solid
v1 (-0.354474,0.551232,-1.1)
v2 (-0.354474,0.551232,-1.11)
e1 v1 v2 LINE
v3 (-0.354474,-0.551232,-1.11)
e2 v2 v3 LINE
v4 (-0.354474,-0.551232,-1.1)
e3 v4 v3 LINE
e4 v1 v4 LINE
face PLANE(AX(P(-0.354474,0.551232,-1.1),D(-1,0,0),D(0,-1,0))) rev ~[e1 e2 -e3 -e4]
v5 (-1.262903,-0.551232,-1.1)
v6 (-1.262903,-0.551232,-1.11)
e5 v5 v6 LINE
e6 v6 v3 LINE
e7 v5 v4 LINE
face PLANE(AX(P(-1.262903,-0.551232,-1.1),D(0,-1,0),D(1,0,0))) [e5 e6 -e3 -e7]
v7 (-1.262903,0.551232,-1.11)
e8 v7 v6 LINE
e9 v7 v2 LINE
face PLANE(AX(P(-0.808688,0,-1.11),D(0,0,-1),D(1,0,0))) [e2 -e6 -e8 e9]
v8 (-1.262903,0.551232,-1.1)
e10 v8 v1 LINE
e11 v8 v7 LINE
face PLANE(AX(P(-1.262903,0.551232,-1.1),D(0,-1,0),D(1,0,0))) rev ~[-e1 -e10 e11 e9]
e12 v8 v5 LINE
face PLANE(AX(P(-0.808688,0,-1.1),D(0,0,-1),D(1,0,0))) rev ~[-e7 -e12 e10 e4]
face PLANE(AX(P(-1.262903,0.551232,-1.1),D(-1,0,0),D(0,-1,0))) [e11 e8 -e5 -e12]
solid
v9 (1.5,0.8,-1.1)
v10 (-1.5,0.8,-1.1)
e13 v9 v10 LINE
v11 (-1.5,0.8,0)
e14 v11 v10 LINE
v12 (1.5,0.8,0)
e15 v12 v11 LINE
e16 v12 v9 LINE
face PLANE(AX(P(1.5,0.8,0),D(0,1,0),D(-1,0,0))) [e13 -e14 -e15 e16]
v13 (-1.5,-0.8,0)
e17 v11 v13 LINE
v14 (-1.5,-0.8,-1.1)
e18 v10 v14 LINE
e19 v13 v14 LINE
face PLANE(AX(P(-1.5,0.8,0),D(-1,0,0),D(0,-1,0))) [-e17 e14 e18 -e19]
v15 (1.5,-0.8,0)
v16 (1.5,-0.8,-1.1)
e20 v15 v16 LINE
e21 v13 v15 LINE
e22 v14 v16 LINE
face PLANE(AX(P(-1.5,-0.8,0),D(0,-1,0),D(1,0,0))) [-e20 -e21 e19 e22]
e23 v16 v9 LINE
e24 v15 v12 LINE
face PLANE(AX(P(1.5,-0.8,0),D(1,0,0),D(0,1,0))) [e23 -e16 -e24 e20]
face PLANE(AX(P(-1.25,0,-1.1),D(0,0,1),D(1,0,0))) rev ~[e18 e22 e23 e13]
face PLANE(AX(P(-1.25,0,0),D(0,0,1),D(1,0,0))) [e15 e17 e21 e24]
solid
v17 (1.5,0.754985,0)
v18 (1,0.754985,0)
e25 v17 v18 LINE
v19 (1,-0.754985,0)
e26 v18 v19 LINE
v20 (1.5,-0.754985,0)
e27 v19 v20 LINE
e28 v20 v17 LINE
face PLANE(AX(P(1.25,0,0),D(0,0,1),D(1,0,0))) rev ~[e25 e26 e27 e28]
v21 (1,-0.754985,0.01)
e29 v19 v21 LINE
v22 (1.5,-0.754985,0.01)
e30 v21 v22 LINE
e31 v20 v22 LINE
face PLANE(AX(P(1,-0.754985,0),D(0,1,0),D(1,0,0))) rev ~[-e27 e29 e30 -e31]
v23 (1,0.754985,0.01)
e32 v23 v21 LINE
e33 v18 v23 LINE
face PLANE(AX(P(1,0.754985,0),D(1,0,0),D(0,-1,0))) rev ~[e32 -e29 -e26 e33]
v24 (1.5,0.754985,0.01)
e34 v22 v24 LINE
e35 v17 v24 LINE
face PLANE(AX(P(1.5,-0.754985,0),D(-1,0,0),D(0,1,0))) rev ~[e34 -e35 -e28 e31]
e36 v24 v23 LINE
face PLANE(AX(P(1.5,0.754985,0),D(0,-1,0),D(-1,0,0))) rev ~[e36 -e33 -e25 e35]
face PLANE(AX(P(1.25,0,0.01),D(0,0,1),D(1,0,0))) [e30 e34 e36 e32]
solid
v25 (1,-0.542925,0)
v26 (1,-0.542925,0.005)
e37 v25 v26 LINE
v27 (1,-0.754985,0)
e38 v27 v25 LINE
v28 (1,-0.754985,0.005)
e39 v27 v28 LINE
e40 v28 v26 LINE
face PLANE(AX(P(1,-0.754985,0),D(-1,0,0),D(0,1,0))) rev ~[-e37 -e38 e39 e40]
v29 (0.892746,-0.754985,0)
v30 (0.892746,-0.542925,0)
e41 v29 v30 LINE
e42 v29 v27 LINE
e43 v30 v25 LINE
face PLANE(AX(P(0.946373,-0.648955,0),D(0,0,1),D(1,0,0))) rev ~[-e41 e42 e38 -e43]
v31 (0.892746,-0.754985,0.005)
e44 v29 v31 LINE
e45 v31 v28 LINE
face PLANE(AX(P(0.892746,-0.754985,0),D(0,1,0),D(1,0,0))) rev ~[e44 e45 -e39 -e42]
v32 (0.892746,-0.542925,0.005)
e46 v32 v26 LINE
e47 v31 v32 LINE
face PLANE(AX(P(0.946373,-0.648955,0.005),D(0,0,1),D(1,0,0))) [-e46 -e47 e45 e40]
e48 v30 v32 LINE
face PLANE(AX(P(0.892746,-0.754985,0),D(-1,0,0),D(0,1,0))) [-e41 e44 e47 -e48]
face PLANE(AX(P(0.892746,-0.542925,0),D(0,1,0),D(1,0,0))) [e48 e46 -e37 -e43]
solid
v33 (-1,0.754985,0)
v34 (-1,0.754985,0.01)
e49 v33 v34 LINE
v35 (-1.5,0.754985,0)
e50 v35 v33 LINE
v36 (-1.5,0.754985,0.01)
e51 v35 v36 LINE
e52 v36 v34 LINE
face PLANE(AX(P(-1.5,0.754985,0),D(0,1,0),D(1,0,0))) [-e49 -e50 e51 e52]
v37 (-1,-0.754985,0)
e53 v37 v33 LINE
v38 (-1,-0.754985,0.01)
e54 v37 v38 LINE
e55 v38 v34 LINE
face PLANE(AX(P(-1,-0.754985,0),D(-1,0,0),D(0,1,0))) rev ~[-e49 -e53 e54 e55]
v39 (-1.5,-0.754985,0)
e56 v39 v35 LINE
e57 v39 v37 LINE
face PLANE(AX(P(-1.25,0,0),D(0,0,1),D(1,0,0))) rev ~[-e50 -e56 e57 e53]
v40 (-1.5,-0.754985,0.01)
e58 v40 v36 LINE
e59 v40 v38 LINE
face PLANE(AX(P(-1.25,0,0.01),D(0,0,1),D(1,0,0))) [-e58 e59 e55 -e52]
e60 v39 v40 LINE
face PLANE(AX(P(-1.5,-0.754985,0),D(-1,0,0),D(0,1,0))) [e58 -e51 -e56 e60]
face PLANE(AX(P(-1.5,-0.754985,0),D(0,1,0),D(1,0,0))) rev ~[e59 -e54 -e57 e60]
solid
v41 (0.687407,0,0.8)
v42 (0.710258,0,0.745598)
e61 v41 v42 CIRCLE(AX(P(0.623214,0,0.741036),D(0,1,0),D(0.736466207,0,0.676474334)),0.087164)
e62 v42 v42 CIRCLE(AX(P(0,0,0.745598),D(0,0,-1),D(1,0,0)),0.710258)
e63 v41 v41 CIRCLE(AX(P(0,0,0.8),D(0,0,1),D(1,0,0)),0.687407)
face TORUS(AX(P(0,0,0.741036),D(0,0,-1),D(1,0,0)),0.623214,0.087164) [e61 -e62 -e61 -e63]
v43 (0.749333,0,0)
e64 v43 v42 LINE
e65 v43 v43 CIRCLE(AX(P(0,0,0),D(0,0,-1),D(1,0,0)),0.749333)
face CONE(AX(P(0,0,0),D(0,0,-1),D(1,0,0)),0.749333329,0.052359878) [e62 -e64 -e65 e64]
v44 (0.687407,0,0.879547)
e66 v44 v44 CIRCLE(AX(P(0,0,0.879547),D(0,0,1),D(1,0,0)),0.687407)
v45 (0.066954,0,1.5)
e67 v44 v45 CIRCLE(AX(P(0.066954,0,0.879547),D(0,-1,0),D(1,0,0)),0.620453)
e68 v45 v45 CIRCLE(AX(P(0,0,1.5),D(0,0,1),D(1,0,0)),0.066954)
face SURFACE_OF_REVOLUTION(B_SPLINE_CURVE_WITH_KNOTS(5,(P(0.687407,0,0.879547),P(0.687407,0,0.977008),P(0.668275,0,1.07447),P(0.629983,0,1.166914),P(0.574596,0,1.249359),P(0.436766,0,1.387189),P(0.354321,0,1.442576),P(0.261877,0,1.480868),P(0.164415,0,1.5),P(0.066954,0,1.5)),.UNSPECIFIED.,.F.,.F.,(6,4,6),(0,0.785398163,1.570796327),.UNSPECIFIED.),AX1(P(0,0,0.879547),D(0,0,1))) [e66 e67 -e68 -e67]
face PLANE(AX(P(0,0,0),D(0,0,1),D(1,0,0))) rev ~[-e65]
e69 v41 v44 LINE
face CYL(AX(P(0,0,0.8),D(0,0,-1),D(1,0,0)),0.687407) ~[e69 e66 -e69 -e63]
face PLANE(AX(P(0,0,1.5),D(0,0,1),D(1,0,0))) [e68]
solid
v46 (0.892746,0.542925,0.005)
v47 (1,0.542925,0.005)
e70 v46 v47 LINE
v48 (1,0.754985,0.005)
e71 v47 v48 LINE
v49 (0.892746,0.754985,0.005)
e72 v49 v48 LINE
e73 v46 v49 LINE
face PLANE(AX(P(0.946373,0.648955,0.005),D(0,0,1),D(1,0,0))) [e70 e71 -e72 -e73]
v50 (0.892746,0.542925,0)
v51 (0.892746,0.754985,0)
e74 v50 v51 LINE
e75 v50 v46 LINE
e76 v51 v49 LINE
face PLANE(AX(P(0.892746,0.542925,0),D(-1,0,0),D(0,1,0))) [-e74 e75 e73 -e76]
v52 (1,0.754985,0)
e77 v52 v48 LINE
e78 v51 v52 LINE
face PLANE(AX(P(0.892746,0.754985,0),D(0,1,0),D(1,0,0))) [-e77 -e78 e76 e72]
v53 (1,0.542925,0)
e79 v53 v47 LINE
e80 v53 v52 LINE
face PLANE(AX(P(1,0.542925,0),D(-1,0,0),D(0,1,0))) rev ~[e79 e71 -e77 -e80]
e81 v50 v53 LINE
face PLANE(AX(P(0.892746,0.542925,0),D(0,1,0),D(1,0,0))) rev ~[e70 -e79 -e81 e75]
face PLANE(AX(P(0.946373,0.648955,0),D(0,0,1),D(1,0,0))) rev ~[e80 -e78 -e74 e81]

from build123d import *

# Parameters (mm, degrees)
F0_W      = 0.5
F0_H      = 1.5099706361
F0_R      = 0.7493333287
F0_W_2    = 0.1072544944
F0_H_2    = 0.2120600548
F1_DEPTH  = 1.1
F2_DEPTH  = 0.8
F2_TAPER  = 3
F4_DEPTH  = 0.01
F5_DEPTH  = 0.005
F3_R      = 0.6874071052
F6_DEPTH  = 0.7
F7_R      = 0.6204528855
F9_W      = 0.9084290941
F9_H      = 1.1024641572
F10_DEPTH = 0.01


# Not quite as in the source:
# - a fillet or chamfer that OpenCascade refuses, or shapes differently, is made with other operations: its cross-section is extruded or revolved along the edge and cut away or added


with BuildPart() as f1:
    # F0 (on Top) → F1 (new body)
    with BuildSketch(Plane.XY):
        with Locations((-1.25, 0)):
            Rectangle(F0_W, F0_H)
        Polygon((-1.5, -0.8), (1.5, -0.8), (1.5, -0.7549853181), (1, -0.7549853181), (0.8927455056, -0.7549853181), (0.8927455056, -0.5429252633), (1, -0.5429252633), (1, 0.5429252633), (0.8927455056, 0.5429252633), (0.8927455056, 0.7549853181), (1, 0.7549853181), (1.5, 0.7549853181), (1.5, 0.8), (-1.5, 0.8), (-1.5, 0.7549853181), (-1, 0.7549853181), (-1, -0.7549853181), (-1.5, -0.7549853181), align=None)
        Circle(F0_R, mode=Mode.SUBTRACT)
        Circle(F0_R)
        with Locations((0.9463727528, 0.6489552907)):
            Rectangle(F0_W_2, F0_H_2)
        Polygon((1, -0.7549853181), (1.5, -0.7549853181), (1.5, 0.7549853181), (1, 0.7549853181), (1, 0.5429252633), (1, -0.5429252633), align=None)
        with Locations((0.9463727528, -0.6489552907)):
            Rectangle(F0_W_2, F0_H_2)
    extrude(amount=-F1_DEPTH)


with BuildPart() as f2:
    # F0 (on Top) → F2 (new body)
    with BuildSketch(Plane.XY):
        Circle(F0_R)
    extrude(amount=F2_DEPTH, taper=F2_TAPER)

    # F3 (on face) → F6 (join)
    with BuildSketch(Plane.XY.offset(0.8)):
        Circle(F3_R)
    extrude(amount=F6_DEPTH)

    # F7
    f7_edges = [f2.edges().sort_by_distance(p)[0] for p in [
        (-0.687407, 0, 1.5),
    ]]
    fillet(f7_edges, radius=F7_R)

    # F8: fillet of radius 0.0871635846 on 1 edges, made by hand

    # F8_s1 → F8_t2 (revolve, cut)
    with BuildSketch(Plane.XZ):
        with BuildLine():
            ThreePointArc((0.6874071052, 0.8), (0.703576177, 0.7747914026), (0.7102582005, 0.7455978618))
            Line((0.7102582005, 0.7455978618), (0.7074071052, 0.8))
            Line((0.7074071052, 0.8), (0.6874071052, 0.8))
        make_face()
    revolve(axis=Axis((0, 0, 0.8), (0, 0, -1)), mode=Mode.SUBTRACT)


with BuildPart() as f4:
    # F0 (on Top) → F4 (new body)
    with BuildSketch(Plane.XY):
        with Locations((-1.25, 0)):
            Rectangle(F0_W, F0_H)
    extrude(amount=F4_DEPTH)


with BuildPart() as f4b:
    # F0 (on Top) → F4, piece 2 (new body)
    with BuildSketch(Plane.XY):
        Polygon((1, -0.7549853181), (1.5, -0.7549853181), (1.5, 0.7549853181), (1, 0.7549853181), (1, 0.5429252633), (1, -0.5429252633), align=None)
    extrude(amount=F4_DEPTH)


with BuildPart() as f5:
    # F0 (on Top) → F5 (new body)
    with BuildSketch(Plane.XY):
        with Locations((0.9463727528, -0.6489552907)):
            Rectangle(F0_W_2, F0_H_2)
    extrude(amount=F5_DEPTH)


with BuildPart() as f5b:
    # F0 (on Top) → F5, piece 2 (new body)
    with BuildSketch(Plane.XY):
        with Locations((0.9463727528, 0.6489552907)):
            Rectangle(F0_W_2, F0_H_2)
    extrude(amount=F5_DEPTH)


with BuildPart() as f10:
    # F9 (on face) → F10 (new body)
    with BuildSketch(Plane(origin=(0, 0, -1.1), x_dir=(1, 0, 0), z_dir=(0, 0, -1))):
        with Locations((-0.8086880553, 0)):
            Rectangle(F9_W, F9_H)
    extrude(amount=F10_DEPTH)


solid = Compound([f1.part, f2.part, f4.part, f4b.part, f5.part, f5b.part, f10.part])
